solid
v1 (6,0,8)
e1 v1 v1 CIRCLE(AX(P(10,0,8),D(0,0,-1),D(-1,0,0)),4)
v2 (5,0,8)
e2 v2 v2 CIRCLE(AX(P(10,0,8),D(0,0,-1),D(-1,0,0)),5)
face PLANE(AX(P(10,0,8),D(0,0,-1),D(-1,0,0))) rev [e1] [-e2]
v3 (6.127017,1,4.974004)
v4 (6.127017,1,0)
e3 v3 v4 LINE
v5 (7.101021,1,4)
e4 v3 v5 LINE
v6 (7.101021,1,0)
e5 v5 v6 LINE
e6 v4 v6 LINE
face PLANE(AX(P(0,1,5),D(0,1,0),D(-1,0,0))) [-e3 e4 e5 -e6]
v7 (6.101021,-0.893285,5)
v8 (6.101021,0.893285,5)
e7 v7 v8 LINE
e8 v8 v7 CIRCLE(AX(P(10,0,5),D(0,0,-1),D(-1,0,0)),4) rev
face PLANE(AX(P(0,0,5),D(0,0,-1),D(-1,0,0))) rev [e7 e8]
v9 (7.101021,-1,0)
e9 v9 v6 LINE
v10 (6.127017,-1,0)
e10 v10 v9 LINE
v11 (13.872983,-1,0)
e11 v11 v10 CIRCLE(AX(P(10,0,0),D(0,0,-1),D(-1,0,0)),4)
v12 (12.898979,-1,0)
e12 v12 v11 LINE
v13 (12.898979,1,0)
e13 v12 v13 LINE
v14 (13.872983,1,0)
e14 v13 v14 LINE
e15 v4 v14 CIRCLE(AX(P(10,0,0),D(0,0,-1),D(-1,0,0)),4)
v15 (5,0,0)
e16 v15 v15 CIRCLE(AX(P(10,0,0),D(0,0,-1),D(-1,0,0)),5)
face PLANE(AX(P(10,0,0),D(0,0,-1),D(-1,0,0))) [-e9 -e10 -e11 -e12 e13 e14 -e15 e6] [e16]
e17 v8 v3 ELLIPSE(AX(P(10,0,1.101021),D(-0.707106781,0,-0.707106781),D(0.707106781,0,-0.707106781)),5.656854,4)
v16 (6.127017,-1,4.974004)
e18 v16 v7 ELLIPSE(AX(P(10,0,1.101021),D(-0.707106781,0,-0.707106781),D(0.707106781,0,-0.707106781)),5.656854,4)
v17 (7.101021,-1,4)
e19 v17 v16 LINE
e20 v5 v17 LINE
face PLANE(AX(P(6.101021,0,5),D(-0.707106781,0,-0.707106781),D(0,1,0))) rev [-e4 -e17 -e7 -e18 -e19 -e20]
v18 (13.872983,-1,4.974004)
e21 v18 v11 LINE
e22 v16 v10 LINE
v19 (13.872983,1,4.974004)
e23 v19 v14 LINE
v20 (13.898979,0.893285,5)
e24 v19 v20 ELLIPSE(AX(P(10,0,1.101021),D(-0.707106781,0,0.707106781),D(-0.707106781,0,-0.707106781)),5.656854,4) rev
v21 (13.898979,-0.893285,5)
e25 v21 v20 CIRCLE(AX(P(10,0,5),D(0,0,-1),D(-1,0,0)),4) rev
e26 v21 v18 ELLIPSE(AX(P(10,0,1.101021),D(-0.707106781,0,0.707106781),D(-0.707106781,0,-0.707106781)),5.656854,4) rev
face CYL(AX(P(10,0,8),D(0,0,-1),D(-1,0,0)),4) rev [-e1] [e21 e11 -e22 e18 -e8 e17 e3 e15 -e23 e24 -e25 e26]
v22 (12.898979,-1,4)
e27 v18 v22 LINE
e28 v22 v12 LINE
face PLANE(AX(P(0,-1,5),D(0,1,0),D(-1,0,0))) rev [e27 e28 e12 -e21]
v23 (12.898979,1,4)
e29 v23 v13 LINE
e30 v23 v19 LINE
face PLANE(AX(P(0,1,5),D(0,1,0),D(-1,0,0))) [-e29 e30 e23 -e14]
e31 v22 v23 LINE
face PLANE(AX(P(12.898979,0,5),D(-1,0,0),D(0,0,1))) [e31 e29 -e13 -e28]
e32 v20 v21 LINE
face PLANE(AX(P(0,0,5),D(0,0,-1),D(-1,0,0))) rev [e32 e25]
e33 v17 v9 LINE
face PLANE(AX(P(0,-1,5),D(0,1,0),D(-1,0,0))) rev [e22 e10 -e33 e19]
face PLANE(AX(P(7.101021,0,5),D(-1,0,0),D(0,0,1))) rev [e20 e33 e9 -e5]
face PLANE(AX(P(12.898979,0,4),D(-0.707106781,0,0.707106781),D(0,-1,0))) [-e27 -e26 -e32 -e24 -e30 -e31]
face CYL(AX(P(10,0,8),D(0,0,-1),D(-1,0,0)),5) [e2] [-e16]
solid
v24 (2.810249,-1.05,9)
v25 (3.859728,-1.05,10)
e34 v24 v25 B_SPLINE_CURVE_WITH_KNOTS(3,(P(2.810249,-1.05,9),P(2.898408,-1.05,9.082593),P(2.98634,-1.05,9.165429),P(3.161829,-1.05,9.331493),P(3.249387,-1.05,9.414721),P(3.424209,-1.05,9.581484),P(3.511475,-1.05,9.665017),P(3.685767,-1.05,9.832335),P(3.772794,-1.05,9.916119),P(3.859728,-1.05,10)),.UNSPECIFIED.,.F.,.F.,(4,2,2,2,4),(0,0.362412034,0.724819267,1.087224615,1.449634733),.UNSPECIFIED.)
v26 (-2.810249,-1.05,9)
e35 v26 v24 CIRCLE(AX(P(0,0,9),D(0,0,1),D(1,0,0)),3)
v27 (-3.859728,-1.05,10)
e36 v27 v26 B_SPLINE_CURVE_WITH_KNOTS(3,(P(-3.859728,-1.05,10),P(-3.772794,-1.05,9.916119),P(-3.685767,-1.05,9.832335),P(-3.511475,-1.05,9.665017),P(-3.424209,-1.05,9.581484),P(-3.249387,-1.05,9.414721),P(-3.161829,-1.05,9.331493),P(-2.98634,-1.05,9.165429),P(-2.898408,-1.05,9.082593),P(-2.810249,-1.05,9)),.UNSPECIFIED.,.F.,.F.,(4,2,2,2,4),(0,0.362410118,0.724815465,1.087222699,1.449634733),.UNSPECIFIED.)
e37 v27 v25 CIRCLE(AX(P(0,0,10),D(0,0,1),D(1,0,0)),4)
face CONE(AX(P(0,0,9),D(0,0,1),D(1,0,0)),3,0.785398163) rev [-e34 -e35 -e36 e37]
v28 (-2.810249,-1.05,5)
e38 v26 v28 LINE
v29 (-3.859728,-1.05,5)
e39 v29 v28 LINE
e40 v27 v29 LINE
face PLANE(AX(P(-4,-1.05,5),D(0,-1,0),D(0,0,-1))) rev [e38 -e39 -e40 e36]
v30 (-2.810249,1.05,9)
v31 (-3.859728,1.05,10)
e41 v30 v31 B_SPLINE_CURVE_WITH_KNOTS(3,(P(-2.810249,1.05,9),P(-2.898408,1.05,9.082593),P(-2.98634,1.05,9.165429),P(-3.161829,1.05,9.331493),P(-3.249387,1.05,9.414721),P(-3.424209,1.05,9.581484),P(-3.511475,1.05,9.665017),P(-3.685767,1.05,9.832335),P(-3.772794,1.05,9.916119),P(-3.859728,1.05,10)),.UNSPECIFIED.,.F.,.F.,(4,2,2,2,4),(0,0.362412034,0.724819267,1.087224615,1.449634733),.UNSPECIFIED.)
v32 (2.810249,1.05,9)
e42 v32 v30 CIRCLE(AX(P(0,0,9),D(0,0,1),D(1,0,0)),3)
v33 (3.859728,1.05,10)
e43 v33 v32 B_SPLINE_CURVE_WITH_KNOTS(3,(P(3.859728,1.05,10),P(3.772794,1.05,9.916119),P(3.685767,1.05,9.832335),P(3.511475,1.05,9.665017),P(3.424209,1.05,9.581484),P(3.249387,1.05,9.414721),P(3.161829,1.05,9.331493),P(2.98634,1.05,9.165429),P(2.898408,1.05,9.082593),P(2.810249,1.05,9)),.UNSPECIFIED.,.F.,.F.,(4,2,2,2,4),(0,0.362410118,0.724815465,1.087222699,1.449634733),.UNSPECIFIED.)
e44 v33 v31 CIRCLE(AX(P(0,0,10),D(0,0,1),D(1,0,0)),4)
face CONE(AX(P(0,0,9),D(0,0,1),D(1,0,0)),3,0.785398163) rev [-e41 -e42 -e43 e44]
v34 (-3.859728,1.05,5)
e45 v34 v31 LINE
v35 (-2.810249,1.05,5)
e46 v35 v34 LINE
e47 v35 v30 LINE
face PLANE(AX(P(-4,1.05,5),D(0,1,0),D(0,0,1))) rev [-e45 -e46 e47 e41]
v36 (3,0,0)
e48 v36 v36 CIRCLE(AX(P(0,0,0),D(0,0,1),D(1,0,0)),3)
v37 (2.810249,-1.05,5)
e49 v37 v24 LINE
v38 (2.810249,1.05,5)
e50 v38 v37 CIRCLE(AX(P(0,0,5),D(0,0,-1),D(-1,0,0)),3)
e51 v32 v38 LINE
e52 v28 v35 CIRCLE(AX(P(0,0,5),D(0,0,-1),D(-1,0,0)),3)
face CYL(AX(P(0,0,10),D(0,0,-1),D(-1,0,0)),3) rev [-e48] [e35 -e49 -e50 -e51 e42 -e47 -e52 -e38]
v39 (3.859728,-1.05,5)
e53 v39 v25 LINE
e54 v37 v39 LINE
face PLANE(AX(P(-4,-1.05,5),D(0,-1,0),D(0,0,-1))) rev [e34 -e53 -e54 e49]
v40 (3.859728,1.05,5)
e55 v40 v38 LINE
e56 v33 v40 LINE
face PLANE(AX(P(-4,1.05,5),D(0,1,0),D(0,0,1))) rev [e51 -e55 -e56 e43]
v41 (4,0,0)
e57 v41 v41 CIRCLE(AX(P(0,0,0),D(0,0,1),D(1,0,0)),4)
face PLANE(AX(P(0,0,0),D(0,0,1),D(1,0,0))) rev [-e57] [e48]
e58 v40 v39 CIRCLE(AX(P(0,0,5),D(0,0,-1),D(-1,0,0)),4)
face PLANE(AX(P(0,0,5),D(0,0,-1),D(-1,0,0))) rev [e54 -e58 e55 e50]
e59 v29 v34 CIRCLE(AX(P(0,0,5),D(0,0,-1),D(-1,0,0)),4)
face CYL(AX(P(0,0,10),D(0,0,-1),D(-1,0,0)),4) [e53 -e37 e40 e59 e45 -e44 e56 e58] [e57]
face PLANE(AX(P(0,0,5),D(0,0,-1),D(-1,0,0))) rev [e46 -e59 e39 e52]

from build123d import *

# Parameters (mm, degrees)
SKETCH1_R           = 4
SKETCH1_R_2         = 3
BOSS_EXTRUDE1_DEPTH = 10
SKETCH2_W           = 8
SKETCH2_H           = 2.1
CUT_EXTRUDE1_DEPTH  = 5
SKETCH3_R           = 5
SKETCH3_R_2         = 4
BOSS_EXTRUDE2_DEPTH = 8
BOSS_EXTRUDE3_DEPTH = 5
CHAMFER1_SIZE       = 1
CHAMFER2_SIZE       = 1


with BuildPart() as part:
    # Sketch1 → Boss-Extrude1 (new body)
    with BuildSketch(Plane.XY):
        Circle(SKETCH1_R)
        Circle(SKETCH1_R_2, mode=Mode.SUBTRACT)
    extrude(amount=BOSS_EXTRUDE1_DEPTH)

    # Sketch2 → Cut-Extrude1 (cut)
    with BuildSketch(Plane.XY.offset(10)):
        Rectangle(SKETCH2_W, SKETCH2_H)
    extrude(amount=-CUT_EXTRUDE1_DEPTH, mode=Mode.SUBTRACT)

    # Chamfer2
    chamfer2_edges = [part.edges().sort_by_distance(p)[0] for p in [
        (0, -3, 10),
        (0, 3, 10),
    ]]
    chamfer(chamfer2_edges, length=CHAMFER2_SIZE - 0.0001)  # a hair under: the kernel refuses the full size


with BuildPart() as body_2:
    # Sketch3 → Boss-Extrude2 (new body)
    with BuildSketch(Plane(origin=(0, 0, 0), x_dir=(-1, 0, 0), z_dir=(0, 0, -1))):
        with Locations((-10, 0)):
            Circle(SKETCH3_R)
        with Locations((-10, 0)):
            Circle(SKETCH3_R_2, mode=Mode.SUBTRACT)
    extrude(amount=-BOSS_EXTRUDE2_DEPTH)

    # Sketch4 → Boss-Extrude3 (add)
    with BuildSketch(Plane(origin=(0, 0, 0), x_dir=(-1, 0, 0), z_dir=(0, 0, -1))):
        with BuildLine():
            Line((-13.872983346, -1), (-12.898979486, -1))
            Line((-12.898979486, -1), (-12.898979486, 1))
            Line((-12.898979486, 1), (-13.872983346, 1))
            ThreePointArc((-13.872983346, 1), (-14, 0), (-13.872983346, -1))
        make_face()
        with BuildLine():
            Line((-7.101020514, 1), (-7.101020514, -1))
            Line((-7.101020514, -1), (-6.127016654, -1))
            ThreePointArc((-6.127016654, -1), (-6.031881215, -0.50401717), (-6, 0))
            ThreePointArc((-6, 0), (-6.031881215, 0.50401717), (-6.127016654, 1))
            Line((-6.127016654, 1), (-7.101020514, 1))
        make_face()
    extrude(amount=-BOSS_EXTRUDE3_DEPTH)

    # Chamfer1
    chamfer1_edges = [body_2.edges().sort_by_distance(p)[0] for p in [
        (12.898979486, 0, 5),
        (7.101020514, 0, 5),
    ]]
    chamfer(chamfer1_edges, length=CHAMFER1_SIZE)


solid = Compound([part.part, body_2.part])
